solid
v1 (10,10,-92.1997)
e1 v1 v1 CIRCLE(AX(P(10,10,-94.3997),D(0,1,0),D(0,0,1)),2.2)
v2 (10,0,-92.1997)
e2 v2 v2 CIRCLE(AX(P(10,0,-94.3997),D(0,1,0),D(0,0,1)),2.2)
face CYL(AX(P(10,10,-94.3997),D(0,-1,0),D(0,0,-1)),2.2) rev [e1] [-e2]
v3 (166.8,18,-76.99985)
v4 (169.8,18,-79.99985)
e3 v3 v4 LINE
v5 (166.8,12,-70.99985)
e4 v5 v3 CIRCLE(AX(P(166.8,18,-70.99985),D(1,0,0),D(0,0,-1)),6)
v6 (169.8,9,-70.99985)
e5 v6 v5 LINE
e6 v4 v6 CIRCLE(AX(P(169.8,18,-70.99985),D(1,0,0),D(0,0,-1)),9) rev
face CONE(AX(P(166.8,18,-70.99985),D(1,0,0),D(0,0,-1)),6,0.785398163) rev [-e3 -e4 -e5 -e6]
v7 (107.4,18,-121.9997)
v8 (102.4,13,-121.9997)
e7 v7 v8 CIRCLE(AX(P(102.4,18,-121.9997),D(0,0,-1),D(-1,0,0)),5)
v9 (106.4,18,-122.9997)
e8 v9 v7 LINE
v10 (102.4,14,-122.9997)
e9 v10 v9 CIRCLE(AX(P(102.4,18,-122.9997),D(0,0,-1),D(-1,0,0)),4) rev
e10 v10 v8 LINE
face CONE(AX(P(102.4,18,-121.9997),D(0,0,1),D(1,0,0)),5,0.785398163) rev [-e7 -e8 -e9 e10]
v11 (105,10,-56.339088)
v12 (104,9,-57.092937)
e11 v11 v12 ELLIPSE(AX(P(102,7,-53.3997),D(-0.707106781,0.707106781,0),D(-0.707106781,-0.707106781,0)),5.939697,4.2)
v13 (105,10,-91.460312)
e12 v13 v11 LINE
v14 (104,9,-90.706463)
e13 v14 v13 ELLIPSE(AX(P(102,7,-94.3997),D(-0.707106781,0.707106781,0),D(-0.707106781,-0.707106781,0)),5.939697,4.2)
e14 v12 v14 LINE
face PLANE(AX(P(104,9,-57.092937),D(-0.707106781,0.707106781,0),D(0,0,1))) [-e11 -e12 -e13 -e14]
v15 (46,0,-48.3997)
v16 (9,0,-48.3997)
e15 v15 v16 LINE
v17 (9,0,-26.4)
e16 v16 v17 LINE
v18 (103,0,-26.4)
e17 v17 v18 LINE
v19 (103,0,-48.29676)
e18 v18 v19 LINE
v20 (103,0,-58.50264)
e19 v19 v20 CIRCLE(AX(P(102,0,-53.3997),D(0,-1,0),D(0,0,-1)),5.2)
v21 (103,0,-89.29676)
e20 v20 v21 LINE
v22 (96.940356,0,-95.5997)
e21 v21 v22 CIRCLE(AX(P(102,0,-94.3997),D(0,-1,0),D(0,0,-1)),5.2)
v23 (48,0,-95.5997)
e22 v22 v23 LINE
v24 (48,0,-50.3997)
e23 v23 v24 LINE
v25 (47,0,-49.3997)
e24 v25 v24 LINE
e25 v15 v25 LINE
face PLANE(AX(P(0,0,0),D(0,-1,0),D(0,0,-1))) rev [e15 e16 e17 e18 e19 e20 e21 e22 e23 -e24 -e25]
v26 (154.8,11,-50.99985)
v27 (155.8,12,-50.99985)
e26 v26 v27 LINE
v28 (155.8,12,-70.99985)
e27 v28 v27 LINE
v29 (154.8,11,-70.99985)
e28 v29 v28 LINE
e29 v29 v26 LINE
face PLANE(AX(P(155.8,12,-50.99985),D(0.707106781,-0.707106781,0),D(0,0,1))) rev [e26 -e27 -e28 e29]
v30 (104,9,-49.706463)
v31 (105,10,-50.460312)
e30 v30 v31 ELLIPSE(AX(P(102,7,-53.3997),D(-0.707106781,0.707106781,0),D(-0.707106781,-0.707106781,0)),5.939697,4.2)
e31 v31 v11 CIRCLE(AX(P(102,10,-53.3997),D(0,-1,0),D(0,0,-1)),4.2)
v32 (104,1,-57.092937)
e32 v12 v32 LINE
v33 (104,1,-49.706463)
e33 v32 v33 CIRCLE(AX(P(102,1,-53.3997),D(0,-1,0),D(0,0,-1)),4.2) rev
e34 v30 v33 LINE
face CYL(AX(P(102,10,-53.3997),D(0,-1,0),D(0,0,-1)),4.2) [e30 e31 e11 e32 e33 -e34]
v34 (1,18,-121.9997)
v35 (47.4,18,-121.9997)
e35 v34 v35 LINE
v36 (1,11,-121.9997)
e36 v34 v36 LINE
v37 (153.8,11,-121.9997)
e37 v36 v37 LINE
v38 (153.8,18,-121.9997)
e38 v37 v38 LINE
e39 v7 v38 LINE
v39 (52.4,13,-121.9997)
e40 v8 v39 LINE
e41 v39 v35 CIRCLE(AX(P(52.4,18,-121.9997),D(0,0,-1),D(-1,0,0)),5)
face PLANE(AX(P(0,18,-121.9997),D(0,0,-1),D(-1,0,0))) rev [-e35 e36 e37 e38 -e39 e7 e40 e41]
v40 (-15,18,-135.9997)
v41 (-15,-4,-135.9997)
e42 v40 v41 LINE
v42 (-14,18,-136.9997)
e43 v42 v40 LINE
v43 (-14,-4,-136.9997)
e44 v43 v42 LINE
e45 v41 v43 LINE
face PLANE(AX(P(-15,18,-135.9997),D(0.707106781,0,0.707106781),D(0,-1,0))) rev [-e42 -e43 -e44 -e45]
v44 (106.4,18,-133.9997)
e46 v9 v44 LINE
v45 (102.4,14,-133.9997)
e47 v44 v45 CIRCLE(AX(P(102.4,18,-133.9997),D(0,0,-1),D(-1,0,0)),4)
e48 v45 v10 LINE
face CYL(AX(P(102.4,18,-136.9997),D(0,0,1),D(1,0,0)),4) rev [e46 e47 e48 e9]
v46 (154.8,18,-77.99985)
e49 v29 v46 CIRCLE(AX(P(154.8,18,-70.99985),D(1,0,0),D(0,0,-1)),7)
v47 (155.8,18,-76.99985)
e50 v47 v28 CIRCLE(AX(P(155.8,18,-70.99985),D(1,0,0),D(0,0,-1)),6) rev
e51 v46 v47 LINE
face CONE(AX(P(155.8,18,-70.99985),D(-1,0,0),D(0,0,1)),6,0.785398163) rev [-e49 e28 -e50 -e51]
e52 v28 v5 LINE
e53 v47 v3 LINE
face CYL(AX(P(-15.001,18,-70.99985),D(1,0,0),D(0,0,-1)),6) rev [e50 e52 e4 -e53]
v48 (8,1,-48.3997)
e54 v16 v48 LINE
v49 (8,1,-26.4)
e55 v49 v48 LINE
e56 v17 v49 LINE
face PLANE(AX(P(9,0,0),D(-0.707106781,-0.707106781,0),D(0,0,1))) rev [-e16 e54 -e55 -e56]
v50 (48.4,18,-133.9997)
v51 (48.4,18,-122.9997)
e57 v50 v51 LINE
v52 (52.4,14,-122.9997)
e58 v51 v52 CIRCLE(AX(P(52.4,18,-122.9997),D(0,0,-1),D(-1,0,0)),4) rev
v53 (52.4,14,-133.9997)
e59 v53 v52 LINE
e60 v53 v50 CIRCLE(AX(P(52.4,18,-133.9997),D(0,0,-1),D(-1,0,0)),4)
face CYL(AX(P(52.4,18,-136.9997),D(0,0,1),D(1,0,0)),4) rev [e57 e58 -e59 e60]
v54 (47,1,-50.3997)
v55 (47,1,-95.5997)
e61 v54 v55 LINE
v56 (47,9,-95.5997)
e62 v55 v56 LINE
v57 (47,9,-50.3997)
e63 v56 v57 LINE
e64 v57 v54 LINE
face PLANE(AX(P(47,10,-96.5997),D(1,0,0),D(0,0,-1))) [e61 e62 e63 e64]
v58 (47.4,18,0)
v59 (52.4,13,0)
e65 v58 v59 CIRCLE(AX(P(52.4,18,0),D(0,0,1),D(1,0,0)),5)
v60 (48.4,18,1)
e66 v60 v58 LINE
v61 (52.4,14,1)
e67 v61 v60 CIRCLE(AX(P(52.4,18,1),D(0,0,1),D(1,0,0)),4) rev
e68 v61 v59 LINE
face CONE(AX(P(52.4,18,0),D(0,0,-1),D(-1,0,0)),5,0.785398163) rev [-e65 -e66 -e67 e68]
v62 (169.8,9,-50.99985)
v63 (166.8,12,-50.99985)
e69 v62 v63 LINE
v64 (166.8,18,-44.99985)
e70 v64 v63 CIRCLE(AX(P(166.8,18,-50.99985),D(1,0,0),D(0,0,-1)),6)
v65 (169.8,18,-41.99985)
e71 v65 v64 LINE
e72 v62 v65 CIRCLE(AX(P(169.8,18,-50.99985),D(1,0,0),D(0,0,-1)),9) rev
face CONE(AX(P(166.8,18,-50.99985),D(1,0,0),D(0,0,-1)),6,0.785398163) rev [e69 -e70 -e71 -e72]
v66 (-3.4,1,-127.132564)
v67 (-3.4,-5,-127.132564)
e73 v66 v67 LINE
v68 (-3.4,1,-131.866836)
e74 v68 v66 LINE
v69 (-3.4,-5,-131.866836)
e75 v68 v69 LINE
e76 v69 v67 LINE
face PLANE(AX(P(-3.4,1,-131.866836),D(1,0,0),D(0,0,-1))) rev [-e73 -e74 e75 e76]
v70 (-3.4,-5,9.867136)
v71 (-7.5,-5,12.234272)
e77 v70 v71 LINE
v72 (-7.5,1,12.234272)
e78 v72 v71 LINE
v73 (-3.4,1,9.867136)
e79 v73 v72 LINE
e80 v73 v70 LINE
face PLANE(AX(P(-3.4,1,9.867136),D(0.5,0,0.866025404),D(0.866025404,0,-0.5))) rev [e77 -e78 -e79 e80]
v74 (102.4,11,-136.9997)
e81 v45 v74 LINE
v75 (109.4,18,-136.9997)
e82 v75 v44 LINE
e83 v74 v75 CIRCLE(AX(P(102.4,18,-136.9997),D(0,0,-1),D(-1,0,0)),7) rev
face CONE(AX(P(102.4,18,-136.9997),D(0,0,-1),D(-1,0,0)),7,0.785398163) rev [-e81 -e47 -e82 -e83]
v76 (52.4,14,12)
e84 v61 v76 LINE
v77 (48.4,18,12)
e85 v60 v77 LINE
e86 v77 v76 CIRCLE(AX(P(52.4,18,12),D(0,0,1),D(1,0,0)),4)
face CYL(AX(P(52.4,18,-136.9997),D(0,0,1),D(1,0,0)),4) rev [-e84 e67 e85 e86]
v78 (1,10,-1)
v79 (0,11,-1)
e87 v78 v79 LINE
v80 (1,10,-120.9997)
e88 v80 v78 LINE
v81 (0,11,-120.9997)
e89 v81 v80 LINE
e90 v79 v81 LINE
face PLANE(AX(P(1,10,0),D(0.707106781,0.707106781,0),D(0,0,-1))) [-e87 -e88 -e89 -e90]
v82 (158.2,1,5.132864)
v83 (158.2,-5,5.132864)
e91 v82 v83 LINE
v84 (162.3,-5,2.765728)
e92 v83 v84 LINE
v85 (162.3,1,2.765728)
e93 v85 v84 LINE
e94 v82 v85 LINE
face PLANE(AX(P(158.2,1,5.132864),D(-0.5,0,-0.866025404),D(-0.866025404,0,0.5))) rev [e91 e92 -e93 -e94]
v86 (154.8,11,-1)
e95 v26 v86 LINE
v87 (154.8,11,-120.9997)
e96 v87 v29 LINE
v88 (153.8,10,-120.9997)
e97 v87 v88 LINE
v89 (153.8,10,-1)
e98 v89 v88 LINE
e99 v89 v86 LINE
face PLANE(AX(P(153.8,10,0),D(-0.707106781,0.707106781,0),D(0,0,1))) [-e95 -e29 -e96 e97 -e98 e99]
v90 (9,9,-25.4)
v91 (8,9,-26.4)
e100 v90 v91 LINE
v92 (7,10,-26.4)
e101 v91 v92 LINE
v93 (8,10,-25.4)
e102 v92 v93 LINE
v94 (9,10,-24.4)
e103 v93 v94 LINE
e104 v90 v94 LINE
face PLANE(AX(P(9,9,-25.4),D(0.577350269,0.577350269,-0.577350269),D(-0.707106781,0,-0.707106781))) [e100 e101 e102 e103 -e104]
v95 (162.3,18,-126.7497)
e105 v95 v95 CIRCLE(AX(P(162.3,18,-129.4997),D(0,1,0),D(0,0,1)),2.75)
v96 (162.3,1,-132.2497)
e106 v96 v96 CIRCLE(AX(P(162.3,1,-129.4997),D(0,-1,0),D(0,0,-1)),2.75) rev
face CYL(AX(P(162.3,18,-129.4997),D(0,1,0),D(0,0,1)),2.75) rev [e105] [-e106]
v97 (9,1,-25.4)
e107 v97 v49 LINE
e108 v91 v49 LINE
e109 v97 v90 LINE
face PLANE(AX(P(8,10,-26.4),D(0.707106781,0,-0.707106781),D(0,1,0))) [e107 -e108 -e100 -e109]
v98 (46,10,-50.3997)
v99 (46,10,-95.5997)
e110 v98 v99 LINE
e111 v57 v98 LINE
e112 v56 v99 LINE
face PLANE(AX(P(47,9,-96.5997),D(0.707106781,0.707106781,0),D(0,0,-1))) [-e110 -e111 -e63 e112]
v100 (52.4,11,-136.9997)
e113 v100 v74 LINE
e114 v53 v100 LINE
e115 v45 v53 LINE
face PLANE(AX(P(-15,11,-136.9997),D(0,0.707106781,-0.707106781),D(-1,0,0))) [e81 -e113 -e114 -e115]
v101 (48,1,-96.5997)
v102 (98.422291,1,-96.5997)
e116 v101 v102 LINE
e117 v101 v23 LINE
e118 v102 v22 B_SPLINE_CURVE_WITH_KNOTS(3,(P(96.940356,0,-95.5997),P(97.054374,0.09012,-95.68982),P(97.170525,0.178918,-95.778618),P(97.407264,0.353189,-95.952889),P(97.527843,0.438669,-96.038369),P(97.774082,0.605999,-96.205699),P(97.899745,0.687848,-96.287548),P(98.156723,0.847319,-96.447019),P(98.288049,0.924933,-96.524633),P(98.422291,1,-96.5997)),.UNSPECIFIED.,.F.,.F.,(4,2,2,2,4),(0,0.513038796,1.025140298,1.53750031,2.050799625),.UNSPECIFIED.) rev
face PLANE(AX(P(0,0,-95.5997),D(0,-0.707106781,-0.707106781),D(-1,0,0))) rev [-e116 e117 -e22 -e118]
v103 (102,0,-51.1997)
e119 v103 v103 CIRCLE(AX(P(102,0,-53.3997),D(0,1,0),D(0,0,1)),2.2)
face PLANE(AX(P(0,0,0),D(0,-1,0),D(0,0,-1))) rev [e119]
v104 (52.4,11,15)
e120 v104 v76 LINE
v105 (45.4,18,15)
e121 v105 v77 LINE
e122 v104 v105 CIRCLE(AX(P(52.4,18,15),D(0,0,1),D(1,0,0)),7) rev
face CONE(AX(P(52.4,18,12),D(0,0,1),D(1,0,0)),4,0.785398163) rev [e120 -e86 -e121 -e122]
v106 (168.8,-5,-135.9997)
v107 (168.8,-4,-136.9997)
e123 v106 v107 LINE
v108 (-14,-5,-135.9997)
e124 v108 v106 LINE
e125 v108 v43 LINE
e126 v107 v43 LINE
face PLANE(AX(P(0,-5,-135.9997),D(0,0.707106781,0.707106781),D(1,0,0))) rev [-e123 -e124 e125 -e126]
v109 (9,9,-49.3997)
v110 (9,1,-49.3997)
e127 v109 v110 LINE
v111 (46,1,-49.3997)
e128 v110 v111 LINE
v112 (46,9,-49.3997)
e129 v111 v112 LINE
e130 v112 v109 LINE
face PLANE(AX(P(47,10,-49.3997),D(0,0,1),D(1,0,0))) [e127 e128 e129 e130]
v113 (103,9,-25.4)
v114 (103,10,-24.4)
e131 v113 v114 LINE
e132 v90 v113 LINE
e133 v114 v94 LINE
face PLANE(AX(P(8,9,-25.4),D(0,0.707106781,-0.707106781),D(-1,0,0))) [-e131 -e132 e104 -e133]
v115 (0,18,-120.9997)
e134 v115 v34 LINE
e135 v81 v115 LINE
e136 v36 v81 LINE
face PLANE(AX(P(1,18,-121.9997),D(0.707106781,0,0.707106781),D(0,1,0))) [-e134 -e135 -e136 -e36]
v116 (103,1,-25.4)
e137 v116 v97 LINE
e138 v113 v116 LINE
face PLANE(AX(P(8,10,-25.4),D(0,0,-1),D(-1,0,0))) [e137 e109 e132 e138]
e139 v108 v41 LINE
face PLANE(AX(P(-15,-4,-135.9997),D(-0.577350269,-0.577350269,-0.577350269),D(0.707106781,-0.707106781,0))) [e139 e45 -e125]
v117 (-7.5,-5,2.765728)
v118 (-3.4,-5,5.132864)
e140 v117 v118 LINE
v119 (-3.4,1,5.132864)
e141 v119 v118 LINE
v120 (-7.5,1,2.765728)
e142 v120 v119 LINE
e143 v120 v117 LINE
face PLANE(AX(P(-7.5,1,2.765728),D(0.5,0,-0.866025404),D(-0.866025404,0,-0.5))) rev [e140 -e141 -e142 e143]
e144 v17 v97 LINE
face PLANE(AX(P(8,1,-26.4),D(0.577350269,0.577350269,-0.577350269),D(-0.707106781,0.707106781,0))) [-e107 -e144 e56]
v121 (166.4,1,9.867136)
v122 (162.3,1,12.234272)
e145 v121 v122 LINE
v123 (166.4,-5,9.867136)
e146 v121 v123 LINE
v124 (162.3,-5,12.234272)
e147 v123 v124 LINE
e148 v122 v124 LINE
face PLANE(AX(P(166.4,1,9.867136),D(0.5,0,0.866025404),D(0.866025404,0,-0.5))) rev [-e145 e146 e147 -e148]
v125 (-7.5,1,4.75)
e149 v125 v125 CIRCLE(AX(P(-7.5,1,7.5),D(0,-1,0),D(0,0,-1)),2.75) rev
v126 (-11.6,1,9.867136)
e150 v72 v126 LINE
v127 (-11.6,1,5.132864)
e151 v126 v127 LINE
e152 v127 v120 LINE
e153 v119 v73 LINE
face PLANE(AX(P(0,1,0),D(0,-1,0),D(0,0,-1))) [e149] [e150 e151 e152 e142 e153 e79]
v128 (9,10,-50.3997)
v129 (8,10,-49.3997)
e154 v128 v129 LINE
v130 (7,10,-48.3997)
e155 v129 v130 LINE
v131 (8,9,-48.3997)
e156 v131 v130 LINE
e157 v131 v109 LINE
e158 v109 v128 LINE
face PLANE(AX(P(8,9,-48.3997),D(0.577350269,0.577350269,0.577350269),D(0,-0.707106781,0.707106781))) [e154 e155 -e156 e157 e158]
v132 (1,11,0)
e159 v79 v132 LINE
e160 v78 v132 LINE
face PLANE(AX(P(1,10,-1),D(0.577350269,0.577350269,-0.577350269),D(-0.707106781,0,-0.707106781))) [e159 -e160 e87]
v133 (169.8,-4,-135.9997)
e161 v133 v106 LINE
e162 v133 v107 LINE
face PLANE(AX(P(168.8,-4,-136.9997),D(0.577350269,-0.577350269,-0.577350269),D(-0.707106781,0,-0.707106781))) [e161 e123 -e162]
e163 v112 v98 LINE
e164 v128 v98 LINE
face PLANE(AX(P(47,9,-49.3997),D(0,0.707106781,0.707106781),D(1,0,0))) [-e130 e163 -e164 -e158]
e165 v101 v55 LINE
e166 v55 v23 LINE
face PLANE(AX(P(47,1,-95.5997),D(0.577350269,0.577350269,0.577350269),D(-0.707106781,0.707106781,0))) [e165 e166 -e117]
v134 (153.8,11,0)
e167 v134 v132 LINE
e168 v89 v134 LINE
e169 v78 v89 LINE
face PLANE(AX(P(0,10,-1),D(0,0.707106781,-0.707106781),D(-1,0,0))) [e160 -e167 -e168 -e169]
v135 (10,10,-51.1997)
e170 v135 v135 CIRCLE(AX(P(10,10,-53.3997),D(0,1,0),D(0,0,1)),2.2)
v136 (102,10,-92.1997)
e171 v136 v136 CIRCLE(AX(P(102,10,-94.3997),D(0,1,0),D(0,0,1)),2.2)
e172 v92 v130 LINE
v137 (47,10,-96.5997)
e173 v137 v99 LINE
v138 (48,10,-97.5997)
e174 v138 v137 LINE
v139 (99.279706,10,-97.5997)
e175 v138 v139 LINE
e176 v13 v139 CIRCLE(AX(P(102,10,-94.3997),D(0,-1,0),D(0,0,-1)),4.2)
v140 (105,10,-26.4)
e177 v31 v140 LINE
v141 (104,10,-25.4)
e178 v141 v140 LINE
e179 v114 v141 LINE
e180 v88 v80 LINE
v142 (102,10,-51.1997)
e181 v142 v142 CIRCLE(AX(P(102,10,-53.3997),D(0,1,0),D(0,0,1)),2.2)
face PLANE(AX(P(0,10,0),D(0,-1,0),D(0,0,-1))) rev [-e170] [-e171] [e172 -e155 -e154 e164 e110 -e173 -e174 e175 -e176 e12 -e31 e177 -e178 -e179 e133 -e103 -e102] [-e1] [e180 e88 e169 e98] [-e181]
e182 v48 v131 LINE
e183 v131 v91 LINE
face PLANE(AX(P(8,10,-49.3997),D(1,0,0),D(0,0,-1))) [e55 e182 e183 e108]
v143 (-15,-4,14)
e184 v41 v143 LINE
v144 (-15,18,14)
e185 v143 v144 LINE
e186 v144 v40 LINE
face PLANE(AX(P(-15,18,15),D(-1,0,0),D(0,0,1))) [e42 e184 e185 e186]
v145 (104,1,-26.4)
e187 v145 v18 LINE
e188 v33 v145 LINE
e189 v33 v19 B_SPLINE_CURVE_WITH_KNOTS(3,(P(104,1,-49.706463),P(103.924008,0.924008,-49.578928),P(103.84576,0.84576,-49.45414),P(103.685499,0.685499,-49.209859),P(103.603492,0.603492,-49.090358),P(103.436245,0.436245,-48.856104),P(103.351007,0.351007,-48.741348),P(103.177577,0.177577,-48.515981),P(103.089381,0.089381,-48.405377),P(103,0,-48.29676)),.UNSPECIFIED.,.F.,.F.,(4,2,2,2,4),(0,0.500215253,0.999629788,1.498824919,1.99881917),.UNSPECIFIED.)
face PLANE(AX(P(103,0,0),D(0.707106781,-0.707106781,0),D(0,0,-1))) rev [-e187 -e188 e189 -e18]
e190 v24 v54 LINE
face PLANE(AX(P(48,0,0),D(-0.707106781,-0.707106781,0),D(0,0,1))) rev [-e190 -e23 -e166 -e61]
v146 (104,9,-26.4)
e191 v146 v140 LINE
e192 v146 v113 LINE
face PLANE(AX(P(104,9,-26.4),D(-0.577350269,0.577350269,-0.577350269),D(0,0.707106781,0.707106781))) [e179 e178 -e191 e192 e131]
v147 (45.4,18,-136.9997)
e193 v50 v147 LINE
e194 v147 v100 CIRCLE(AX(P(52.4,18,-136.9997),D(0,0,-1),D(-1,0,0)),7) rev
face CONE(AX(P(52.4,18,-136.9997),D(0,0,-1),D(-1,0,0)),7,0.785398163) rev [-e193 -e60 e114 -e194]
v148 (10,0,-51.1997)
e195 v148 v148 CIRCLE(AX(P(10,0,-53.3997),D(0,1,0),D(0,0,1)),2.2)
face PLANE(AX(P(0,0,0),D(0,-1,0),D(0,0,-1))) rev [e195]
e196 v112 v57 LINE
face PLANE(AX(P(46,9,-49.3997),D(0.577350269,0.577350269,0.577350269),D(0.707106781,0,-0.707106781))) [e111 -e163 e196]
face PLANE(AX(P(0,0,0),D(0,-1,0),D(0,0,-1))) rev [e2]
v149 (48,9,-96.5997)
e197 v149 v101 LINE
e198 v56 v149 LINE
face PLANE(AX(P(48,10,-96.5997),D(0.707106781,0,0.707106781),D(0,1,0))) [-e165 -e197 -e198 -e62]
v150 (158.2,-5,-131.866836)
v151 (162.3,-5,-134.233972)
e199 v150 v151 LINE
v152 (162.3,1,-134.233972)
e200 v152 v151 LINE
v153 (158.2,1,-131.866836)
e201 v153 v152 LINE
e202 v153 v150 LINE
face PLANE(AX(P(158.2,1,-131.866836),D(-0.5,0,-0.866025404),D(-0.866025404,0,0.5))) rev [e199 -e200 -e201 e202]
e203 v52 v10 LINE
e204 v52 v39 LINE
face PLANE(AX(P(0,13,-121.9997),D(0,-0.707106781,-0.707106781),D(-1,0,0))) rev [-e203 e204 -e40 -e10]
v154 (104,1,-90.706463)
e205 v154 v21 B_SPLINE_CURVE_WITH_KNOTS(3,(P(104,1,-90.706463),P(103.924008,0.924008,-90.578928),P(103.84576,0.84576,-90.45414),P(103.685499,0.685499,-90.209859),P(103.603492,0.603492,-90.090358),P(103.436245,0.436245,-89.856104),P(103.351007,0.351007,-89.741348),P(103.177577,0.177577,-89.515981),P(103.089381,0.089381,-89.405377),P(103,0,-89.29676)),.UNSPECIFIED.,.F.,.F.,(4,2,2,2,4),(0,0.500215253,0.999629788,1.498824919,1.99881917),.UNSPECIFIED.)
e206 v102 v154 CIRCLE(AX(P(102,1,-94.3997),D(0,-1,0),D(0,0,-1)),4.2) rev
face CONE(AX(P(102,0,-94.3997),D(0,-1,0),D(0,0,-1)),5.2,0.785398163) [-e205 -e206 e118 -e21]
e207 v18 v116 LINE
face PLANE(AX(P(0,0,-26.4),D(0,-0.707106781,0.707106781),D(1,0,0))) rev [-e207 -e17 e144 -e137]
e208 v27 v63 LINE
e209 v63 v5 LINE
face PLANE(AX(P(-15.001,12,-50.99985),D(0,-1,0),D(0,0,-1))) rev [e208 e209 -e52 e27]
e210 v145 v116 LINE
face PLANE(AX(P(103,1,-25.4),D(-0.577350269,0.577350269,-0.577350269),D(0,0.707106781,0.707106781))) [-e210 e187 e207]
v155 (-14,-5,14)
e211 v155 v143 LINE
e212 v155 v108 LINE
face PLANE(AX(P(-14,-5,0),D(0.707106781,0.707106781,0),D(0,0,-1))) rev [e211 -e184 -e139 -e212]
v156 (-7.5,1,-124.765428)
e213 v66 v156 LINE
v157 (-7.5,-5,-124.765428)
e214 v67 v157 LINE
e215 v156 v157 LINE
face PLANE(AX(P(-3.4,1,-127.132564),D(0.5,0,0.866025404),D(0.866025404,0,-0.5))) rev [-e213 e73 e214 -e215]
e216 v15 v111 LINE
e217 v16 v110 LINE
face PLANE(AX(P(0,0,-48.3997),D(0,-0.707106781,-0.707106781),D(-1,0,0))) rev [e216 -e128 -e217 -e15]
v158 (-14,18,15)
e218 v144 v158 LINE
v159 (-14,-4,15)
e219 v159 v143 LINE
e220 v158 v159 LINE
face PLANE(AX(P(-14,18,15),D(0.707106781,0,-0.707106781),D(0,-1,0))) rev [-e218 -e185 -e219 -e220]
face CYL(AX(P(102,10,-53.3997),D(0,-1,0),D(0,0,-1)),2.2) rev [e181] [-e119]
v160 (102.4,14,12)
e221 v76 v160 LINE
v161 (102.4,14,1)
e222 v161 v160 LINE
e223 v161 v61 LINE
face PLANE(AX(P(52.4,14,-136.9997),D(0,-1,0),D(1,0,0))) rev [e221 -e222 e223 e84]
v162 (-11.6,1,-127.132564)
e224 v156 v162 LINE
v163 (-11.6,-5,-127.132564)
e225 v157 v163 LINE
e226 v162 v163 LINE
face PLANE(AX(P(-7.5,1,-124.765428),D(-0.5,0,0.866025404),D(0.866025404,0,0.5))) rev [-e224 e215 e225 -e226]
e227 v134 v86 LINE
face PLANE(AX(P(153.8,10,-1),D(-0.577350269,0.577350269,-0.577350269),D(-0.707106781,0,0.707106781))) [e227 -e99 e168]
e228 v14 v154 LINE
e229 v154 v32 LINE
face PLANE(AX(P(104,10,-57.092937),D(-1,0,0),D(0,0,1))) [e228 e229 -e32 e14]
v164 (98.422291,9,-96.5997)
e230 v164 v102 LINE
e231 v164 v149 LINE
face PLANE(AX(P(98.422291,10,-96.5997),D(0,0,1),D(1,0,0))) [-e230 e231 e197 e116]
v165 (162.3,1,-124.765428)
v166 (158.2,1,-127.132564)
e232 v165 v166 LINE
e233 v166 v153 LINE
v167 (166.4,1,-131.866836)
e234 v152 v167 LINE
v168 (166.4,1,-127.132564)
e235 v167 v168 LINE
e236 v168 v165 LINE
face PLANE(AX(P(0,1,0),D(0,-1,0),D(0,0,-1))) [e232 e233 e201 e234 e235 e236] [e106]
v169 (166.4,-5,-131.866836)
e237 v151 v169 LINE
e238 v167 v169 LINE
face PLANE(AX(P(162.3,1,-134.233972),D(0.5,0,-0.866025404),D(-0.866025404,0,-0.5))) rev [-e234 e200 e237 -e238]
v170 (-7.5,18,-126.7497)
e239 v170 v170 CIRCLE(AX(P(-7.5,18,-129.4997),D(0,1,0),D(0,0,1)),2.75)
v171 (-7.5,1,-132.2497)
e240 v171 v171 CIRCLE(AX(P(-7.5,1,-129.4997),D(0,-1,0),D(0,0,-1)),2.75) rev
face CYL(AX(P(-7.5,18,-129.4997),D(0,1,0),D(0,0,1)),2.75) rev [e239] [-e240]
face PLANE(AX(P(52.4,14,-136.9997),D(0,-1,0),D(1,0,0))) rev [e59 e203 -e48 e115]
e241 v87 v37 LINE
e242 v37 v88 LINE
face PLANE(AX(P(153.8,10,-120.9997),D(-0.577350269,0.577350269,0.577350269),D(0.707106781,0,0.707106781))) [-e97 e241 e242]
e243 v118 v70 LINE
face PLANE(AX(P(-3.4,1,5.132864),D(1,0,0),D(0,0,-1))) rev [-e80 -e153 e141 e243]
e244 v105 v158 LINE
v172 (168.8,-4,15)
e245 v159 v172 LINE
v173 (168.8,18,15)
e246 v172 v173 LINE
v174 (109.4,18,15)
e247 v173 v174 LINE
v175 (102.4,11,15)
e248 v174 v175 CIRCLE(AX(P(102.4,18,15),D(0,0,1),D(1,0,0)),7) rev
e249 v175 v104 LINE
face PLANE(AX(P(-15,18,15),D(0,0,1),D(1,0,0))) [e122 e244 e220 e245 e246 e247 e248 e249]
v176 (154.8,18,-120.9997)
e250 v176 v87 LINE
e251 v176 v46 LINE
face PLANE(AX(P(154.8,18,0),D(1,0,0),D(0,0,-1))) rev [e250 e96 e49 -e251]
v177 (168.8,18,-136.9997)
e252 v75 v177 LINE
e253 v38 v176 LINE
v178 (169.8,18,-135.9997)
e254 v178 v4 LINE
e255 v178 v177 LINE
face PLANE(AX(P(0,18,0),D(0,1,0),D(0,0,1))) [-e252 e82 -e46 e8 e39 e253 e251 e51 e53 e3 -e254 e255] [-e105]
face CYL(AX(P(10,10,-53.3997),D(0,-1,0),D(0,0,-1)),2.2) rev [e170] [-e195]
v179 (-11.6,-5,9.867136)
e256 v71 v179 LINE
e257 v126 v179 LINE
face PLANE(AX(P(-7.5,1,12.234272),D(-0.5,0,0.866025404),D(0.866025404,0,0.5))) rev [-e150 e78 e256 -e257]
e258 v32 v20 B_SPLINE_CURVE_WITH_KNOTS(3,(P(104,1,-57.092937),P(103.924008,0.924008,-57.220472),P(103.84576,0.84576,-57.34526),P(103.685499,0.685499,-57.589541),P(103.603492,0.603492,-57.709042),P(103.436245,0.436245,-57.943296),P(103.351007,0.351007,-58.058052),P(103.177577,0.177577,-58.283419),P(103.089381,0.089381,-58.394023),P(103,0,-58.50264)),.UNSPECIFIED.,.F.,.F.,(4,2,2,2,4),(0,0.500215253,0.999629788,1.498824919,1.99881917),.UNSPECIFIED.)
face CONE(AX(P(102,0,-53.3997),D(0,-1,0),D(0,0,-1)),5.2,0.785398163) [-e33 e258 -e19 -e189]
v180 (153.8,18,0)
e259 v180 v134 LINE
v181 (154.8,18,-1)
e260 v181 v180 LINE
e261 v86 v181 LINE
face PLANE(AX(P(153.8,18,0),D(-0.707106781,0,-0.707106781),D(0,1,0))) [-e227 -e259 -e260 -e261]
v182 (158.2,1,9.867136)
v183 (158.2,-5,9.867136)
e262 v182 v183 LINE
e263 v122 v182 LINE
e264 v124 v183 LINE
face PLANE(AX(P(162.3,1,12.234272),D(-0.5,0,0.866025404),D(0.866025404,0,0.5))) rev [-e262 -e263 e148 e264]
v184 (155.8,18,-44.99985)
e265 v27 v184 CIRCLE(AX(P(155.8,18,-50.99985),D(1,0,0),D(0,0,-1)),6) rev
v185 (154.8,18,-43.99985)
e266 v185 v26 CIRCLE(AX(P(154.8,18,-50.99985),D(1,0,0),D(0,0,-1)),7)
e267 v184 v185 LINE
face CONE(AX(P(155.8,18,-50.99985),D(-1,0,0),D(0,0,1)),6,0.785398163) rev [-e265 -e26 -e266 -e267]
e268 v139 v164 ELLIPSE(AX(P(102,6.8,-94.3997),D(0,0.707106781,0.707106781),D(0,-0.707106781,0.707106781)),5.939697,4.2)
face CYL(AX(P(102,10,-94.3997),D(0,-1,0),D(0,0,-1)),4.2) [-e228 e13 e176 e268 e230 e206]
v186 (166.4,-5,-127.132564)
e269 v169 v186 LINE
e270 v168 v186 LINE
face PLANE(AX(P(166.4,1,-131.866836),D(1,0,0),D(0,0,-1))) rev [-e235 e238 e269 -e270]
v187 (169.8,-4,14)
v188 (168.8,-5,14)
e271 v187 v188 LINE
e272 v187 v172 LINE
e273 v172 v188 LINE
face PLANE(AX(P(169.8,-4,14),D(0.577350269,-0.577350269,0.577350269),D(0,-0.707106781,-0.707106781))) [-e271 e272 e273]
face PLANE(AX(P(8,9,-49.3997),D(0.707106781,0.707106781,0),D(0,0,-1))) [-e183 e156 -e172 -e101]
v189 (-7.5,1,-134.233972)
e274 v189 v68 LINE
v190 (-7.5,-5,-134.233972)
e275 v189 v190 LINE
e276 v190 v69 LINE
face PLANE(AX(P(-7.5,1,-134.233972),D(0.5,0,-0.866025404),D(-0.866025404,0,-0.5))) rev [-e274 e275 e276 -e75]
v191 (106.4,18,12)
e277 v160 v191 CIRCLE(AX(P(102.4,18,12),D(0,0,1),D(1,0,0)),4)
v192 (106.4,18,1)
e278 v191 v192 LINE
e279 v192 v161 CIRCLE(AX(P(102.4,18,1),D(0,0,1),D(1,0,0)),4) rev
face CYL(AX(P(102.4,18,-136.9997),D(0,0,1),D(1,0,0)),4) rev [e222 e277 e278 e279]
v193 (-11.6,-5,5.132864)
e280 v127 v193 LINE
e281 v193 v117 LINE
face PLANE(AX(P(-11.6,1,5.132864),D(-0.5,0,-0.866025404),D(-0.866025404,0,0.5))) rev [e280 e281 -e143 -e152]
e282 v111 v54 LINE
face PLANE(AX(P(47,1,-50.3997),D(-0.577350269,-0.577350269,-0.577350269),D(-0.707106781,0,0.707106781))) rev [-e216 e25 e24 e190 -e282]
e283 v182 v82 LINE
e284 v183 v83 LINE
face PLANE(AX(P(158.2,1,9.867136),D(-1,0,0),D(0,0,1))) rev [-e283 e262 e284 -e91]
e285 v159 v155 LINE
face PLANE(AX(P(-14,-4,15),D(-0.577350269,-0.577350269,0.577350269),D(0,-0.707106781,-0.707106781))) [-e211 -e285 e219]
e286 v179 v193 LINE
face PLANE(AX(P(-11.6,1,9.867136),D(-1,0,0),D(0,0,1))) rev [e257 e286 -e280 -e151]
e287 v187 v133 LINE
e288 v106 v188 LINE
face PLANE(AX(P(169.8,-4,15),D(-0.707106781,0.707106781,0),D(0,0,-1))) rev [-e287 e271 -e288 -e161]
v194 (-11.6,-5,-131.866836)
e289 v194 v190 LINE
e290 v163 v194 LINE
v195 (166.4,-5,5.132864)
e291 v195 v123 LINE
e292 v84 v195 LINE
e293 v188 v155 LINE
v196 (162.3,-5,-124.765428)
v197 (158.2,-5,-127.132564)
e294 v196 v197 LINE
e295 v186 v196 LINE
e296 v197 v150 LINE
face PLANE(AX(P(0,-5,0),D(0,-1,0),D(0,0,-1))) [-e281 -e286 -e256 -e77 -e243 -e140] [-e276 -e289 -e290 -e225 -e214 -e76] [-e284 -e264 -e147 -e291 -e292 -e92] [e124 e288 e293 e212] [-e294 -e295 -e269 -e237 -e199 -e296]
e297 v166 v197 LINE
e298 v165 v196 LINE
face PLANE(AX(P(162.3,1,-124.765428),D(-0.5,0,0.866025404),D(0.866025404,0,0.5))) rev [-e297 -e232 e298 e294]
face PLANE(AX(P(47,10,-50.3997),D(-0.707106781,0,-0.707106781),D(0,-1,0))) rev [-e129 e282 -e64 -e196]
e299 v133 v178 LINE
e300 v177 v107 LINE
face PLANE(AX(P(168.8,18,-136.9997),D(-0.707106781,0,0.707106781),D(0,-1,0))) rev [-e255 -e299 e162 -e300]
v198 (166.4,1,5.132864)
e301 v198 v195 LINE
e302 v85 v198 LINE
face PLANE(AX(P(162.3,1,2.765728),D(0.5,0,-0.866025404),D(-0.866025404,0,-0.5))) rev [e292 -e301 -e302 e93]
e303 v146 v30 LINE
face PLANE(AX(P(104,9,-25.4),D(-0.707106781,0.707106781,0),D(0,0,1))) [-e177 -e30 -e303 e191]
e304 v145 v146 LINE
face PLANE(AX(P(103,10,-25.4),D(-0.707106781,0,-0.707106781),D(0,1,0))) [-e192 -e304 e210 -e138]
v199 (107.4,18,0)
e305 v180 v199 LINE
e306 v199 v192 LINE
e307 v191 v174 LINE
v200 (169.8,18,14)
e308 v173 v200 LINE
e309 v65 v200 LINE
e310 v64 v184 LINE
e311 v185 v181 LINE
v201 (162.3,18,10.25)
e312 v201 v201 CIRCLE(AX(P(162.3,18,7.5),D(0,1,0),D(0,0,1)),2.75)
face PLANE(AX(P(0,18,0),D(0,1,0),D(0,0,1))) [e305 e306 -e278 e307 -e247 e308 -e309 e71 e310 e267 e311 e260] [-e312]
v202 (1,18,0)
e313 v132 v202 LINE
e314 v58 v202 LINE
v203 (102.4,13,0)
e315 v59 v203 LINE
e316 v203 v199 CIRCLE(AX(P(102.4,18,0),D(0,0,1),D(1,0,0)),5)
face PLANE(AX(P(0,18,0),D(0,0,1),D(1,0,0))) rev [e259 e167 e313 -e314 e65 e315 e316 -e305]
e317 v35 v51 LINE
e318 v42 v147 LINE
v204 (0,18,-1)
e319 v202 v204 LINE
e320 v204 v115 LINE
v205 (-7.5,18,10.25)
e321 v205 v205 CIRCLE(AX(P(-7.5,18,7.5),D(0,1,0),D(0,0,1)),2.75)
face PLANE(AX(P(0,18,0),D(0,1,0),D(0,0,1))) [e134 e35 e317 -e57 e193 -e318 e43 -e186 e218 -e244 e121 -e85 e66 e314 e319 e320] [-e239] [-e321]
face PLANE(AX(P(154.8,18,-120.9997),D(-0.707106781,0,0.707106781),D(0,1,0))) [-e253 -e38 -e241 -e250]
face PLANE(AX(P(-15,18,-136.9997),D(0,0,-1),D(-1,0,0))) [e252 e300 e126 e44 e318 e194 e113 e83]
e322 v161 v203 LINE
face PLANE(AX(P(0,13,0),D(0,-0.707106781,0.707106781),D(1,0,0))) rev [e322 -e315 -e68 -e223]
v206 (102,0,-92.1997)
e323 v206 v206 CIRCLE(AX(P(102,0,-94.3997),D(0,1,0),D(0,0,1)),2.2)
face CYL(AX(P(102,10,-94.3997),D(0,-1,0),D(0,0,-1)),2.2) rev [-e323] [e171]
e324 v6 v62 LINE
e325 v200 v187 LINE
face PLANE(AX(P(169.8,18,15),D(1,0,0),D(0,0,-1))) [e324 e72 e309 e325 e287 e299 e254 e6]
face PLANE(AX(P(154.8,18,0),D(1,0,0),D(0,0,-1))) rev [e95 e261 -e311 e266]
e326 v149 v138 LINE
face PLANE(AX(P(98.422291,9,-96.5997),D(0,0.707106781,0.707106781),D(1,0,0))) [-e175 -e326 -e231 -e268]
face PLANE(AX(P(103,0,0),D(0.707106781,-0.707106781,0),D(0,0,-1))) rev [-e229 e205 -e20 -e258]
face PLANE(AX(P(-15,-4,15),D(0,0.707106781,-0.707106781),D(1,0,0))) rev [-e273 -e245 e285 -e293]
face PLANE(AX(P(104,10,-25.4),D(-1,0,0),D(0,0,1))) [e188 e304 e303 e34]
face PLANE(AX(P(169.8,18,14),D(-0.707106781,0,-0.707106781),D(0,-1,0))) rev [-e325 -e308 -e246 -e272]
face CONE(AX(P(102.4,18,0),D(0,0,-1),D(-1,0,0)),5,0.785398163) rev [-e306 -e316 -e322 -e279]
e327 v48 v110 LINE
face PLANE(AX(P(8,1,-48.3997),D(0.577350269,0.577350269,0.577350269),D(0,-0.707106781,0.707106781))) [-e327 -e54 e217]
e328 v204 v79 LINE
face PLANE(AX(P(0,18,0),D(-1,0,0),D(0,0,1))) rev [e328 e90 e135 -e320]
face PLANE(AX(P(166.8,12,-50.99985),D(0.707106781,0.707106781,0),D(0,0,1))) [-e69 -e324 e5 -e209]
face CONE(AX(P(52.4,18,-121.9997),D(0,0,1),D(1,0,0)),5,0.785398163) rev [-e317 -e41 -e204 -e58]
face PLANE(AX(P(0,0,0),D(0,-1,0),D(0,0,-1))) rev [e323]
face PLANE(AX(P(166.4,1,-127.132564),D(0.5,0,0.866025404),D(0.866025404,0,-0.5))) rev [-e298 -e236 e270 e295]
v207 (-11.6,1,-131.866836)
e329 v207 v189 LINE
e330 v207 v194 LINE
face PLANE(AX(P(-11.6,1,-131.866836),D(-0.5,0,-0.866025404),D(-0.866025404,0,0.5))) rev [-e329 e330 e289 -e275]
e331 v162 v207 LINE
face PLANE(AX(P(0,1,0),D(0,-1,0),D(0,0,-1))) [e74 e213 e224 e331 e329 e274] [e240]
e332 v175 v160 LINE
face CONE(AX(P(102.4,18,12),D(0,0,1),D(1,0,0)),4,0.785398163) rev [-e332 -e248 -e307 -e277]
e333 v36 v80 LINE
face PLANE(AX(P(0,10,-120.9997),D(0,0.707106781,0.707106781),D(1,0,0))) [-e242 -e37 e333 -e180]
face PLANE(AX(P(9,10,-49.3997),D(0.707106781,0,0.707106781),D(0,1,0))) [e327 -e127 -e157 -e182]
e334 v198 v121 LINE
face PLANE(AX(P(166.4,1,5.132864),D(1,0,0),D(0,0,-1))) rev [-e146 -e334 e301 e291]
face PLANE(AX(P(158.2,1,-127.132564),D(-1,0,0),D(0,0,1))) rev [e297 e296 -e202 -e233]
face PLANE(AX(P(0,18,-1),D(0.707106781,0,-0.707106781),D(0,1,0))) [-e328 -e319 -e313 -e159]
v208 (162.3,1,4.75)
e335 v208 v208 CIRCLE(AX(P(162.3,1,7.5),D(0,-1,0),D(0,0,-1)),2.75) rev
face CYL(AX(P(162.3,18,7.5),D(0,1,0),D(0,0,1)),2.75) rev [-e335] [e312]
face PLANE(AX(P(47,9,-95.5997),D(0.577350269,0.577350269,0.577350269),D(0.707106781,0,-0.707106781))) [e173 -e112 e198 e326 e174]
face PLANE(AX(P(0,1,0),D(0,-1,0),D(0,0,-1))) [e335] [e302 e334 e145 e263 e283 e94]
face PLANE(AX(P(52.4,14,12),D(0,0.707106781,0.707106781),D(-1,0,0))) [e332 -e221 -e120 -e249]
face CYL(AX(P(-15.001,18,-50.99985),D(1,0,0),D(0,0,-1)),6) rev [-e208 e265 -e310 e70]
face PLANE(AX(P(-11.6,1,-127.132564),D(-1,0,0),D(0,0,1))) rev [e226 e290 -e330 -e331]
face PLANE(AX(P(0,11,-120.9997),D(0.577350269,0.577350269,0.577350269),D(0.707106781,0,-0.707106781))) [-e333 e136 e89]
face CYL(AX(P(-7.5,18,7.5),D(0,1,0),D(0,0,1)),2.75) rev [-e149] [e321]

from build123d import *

# Parameters (mm, degrees)
SKETCH1_W                = 154.8
SKETCH1_H                = 121.9997
SKETCH1_R                = 2.2
BOSS_EXTRUDE1_DEPTH      = 10
SKETCH2_W                = 184.8
SKETCH2_H                = 151.9997
SKETCH2_W_2              = 154.8
SKETCH2_H_2              = 121.9997
BOSS_EXTRUDE2_DEPTH      = 18
SKETCH2_2_W              = 184.8
SKETCH2_2_H              = 151.9997
SKETCH2_2_W_2            = 154.8
SKETCH2_2_H_2            = 121.9997
BOSS_EXTRUDE3_DEPTH      = 5
CUT_EXTRUDE1_DEPTH       = 229.604349915
CUT_EXTRUDE2_REACH       = 232.747
M5_CLEARANCE_HOLE1_D     = 5.5
M5_CLEARANCE_HOLE1_DEPTH = 23
M5_CLEARANCE_HOLE1_TIP   = 1.652366702
CUT_EXTRUDE3_DEPTH       = 6
CHAMFER1_SIZE            = 1
CHAMFER2_SIZE            = 3


with BuildPart() as part:
    # Sketch1 → Boss-Extrude1 (new body)
    with BuildSketch(Plane(origin=(0, 0, 0), x_dir=(1, 0, 0), z_dir=(0, 1, 0))):
        with Locations((77.4, 60.99985)):
            Rectangle(SKETCH1_W, SKETCH1_H)
        with Locations(Location((10, 53.3997, 0), (0, 0, 270))):
            Circle(SKETCH1_R, mode=Mode.SUBTRACT)
        with Locations(Location((10, 94.3997, 0), (0, 0, 270))):
            Circle(SKETCH1_R, mode=Mode.SUBTRACT)
        with Locations(Location((102, 94.3997, 0), (0, 0, 270))):
            Circle(SKETCH1_R, mode=Mode.SUBTRACT)
        with Locations(Location((102, 53.3997, 0), (0, 0, 270))):
            Circle(SKETCH1_R, mode=Mode.SUBTRACT)
        with BuildLine():
            Line((8, 49.3997), (8, 25.4))
            Line((8, 25.4), (104, 25.4))
            Line((104, 25.4), (104, 49.706462937))
            ThreePointArc((104, 49.706462937), (97.8, 53.3997), (104, 57.092937063))
            Line((104, 57.092937063), (104, 90.706462937))
            ThreePointArc((104, 90.706462937), (98.94961445, 91.512634363), (98.422291236, 96.5997))
            Line((98.422291236, 96.5997), (47, 96.5997))
            Line((47, 96.5997), (47, 49.3997))
            Line((47, 49.3997), (8, 49.3997))
        make_face(mode=Mode.SUBTRACT)
    extrude(amount=BOSS_EXTRUDE1_DEPTH)

    # Sketch2 → Boss-Extrude2 (add)
    with BuildSketch(Plane.XZ):
        with Locations((77.4, -60.99985)):
            Rectangle(SKETCH2_W, SKETCH2_H)
        with Locations((77.4, -60.99985)):
            Rectangle(SKETCH2_W_2, SKETCH2_H_2, mode=Mode.SUBTRACT)
    extrude(amount=-BOSS_EXTRUDE2_DEPTH)

    # Sketch2<2> → Boss-Extrude3 (add)
    # profile 1 of 2: a face of its own
    with BuildSketch(Plane.XZ):
        with Locations((77.4, -60.99985)):
            Rectangle(SKETCH2_2_W, SKETCH2_2_H)
        with Locations((77.4, -60.99985)):
            Rectangle(SKETCH2_2_W_2, SKETCH2_2_H_2, mode=Mode.SUBTRACT)
    # profile 2 of 2: a face of its own
    with BuildSketch(Plane.XZ):
        with Locations((77.4, -60.99985)):
            Rectangle(SKETCH2_2_W_2, SKETCH2_2_H_2)
    extrude(amount=BOSS_EXTRUDE3_DEPTH)

    # Sketch3 → Cut-Extrude1 (cut, through all)
    with BuildSketch(Plane.XY.offset(15)):
        with BuildLine():
            Line((52.4, 22), (102.4, 22))
            ThreePointArc((102.4, 22), (106.4, 18), (102.4, 14))
            Line((102.4, 14), (52.4, 14))
            ThreePointArc((52.4, 14), (48.4, 18), (52.4, 22))
        make_face()
    extrude(amount=-CUT_EXTRUDE1_DEPTH, mode=Mode.SUBTRACT)

    # Sketch4 → Cut-Extrude2 (cut, up to next)
    with BuildSketch(Plane(origin=(169.8, 0, 0), x_dir=(0, 0, -1), z_dir=(1, 0, 0)), mode=Mode.PRIVATE) as cut_extrude2_sk1:
        with BuildLine():
            Line((50.99985, 24), (70.99985, 24))
            ThreePointArc((70.99985, 24), (76.99985, 18), (70.99985, 12))
            Line((70.99985, 12), (50.99985, 12))
            ThreePointArc((50.99985, 12), (44.99985, 18), (50.99985, 24))
        make_face()
    cut_extrude2_tool1 = extrude(cut_extrude2_sk1.sketch, amount=-CUT_EXTRUDE2_REACH, mode=Mode.PRIVATE) & part.part
    add(cut_extrude2_tool1.solids().sort_by_distance((169.8, 18, -60.99985))[0], mode=Mode.SUBTRACT)

    # M5 Clearance Hole1
    with Locations(Plane(origin=(0, 18, 0), x_dir=(1, 0, 0), z_dir=(0, 1, 0))):
        with Locations((162.3, 129.4997), (162.3, -7.5), (-7.5, 129.4997), (-7.5, -7.5)):
            Hole(M5_CLEARANCE_HOLE1_D / 2, depth=M5_CLEARANCE_HOLE1_DEPTH)
            with Locations((0, 0, -(M5_CLEARANCE_HOLE1_DEPTH + M5_CLEARANCE_HOLE1_TIP / 2))):  # 118° drill point
                Cone(0, M5_CLEARANCE_HOLE1_D / 2, M5_CLEARANCE_HOLE1_TIP, mode=Mode.SUBTRACT)

    # Sketch7 → Cut-Extrude3 (cut)
    with BuildSketch(Plane.XZ.offset(5)):
        Polygon((-3.4, 9.867136104), (-7.5, 12.234272207), (-11.6, 9.867136104), (-11.6, 5.132863896), (-7.5, 2.765727793), (-3.4, 5.132863896), align=None)
        Polygon((158.2, 9.867136104), (158.2, 5.132863896), (162.3, 2.765727793), (166.4, 5.132863896), (166.4, 9.867136104), (162.3, 12.234272207), align=None)
        Polygon((158.2, -127.132563896), (158.2, -131.866836104), (162.3, -134.233972207), (166.4, -131.866836104), (166.4, -127.132563896), (162.3, -124.765427793), align=None)
        Polygon((-3.4, -127.132563896), (-7.5, -124.765427793), (-11.6, -127.132563896), (-11.6, -131.866836104), (-7.5, -134.233972207), (-3.4, -131.866836104), align=None)
    extrude(amount=-CUT_EXTRUDE3_DEPTH, mode=Mode.SUBTRACT)

    # Chamfer1
    chamfer1_edges = [part.edges().sort_by_distance(p)[0] for p in [
        (77.4, 14, 0),
        (77.4, 14, -121.9997),
        (49.571572875, 15.171572875, -121.9997),
        (49.571572875, 15.171572875, 0),
        (105.228427125, 15.171572875, 0),
        (105.228427125, 15.171572875, -121.9997),
        (154.8, 10, -60.99985),
        (154.8, 12, -60.99985),
        (154.8, 13.757359313, -46.757209313),
        (154.8, 13.757359313, -75.242490687),
        (77.4, 10, -121.9997),
        (27.5, 0, -49.3997),
        (47, 5, -49.3997),
        (8, 0, -37.39985),
        (8, 5, -49.3997),
        (56, 0, -25.4),
        (8, 5, -25.4),
        (104, 0, -37.553231469),
        (104, 5, -25.4),
        (97.8, 0, -53.3997),
        (104, 0, -73.8997),
        (98.94961445, 0, -91.512634363),
        (72.711145618, 0, -96.5997),
        (47, 0, -72.9997),
        (47, 5, -96.5997),
        (27.5, 10, -49.3997),
        (8, 10, -37.39985),
        (56, 10, -25.4),
        (104, 10, -37.553231469),
        (104, 10, -73.8997),
        (72.711145618, 10, -96.5997),
        (47, 10, -72.9997),
        (0, 10, -60.99985),
        (154.8, 14, 0),
        (0, 14, -121.9997),
        (0, 14, 0),
        (154.8, 14, -121.9997),
        (-15, 6.5, 15),
        (169.8, 6.5, 15),
        (169.8, 6.5, -136.9997),
        (-15, 6.5, -136.9997),
        (169.8, -5, -60.99985),
        (77.4, -5, 15),
        (77.4, 10, 0),
        (-15, -5, -60.99985),
        (77.4, -5, -136.9997),
    ]]
    chamfer(chamfer1_edges, length=CHAMFER1_SIZE - 0.0001)  # a hair under: the kernel refuses the full size

    # Chamfer2
    chamfer2_edges = [part.edges().sort_by_distance(p)[0] for p in [
        (77.4, 14, -136.9997),
        (49.571572875, 15.171572875, -136.9997),
        (105.228427125, 15.171572875, -136.9997),
        (49.571572875, 15.171572875, 15),
        (77.4, 14, 15),
        (105.228427125, 15.171572875, 15),
        (169.8, 13.757359313, -75.242490687),
        (169.8, 13.757359313, -46.757209313),
        (169.8, 12, -60.99985),
    ]]
    chamfer(chamfer2_edges, length=CHAMFER2_SIZE)


solid = part.part
